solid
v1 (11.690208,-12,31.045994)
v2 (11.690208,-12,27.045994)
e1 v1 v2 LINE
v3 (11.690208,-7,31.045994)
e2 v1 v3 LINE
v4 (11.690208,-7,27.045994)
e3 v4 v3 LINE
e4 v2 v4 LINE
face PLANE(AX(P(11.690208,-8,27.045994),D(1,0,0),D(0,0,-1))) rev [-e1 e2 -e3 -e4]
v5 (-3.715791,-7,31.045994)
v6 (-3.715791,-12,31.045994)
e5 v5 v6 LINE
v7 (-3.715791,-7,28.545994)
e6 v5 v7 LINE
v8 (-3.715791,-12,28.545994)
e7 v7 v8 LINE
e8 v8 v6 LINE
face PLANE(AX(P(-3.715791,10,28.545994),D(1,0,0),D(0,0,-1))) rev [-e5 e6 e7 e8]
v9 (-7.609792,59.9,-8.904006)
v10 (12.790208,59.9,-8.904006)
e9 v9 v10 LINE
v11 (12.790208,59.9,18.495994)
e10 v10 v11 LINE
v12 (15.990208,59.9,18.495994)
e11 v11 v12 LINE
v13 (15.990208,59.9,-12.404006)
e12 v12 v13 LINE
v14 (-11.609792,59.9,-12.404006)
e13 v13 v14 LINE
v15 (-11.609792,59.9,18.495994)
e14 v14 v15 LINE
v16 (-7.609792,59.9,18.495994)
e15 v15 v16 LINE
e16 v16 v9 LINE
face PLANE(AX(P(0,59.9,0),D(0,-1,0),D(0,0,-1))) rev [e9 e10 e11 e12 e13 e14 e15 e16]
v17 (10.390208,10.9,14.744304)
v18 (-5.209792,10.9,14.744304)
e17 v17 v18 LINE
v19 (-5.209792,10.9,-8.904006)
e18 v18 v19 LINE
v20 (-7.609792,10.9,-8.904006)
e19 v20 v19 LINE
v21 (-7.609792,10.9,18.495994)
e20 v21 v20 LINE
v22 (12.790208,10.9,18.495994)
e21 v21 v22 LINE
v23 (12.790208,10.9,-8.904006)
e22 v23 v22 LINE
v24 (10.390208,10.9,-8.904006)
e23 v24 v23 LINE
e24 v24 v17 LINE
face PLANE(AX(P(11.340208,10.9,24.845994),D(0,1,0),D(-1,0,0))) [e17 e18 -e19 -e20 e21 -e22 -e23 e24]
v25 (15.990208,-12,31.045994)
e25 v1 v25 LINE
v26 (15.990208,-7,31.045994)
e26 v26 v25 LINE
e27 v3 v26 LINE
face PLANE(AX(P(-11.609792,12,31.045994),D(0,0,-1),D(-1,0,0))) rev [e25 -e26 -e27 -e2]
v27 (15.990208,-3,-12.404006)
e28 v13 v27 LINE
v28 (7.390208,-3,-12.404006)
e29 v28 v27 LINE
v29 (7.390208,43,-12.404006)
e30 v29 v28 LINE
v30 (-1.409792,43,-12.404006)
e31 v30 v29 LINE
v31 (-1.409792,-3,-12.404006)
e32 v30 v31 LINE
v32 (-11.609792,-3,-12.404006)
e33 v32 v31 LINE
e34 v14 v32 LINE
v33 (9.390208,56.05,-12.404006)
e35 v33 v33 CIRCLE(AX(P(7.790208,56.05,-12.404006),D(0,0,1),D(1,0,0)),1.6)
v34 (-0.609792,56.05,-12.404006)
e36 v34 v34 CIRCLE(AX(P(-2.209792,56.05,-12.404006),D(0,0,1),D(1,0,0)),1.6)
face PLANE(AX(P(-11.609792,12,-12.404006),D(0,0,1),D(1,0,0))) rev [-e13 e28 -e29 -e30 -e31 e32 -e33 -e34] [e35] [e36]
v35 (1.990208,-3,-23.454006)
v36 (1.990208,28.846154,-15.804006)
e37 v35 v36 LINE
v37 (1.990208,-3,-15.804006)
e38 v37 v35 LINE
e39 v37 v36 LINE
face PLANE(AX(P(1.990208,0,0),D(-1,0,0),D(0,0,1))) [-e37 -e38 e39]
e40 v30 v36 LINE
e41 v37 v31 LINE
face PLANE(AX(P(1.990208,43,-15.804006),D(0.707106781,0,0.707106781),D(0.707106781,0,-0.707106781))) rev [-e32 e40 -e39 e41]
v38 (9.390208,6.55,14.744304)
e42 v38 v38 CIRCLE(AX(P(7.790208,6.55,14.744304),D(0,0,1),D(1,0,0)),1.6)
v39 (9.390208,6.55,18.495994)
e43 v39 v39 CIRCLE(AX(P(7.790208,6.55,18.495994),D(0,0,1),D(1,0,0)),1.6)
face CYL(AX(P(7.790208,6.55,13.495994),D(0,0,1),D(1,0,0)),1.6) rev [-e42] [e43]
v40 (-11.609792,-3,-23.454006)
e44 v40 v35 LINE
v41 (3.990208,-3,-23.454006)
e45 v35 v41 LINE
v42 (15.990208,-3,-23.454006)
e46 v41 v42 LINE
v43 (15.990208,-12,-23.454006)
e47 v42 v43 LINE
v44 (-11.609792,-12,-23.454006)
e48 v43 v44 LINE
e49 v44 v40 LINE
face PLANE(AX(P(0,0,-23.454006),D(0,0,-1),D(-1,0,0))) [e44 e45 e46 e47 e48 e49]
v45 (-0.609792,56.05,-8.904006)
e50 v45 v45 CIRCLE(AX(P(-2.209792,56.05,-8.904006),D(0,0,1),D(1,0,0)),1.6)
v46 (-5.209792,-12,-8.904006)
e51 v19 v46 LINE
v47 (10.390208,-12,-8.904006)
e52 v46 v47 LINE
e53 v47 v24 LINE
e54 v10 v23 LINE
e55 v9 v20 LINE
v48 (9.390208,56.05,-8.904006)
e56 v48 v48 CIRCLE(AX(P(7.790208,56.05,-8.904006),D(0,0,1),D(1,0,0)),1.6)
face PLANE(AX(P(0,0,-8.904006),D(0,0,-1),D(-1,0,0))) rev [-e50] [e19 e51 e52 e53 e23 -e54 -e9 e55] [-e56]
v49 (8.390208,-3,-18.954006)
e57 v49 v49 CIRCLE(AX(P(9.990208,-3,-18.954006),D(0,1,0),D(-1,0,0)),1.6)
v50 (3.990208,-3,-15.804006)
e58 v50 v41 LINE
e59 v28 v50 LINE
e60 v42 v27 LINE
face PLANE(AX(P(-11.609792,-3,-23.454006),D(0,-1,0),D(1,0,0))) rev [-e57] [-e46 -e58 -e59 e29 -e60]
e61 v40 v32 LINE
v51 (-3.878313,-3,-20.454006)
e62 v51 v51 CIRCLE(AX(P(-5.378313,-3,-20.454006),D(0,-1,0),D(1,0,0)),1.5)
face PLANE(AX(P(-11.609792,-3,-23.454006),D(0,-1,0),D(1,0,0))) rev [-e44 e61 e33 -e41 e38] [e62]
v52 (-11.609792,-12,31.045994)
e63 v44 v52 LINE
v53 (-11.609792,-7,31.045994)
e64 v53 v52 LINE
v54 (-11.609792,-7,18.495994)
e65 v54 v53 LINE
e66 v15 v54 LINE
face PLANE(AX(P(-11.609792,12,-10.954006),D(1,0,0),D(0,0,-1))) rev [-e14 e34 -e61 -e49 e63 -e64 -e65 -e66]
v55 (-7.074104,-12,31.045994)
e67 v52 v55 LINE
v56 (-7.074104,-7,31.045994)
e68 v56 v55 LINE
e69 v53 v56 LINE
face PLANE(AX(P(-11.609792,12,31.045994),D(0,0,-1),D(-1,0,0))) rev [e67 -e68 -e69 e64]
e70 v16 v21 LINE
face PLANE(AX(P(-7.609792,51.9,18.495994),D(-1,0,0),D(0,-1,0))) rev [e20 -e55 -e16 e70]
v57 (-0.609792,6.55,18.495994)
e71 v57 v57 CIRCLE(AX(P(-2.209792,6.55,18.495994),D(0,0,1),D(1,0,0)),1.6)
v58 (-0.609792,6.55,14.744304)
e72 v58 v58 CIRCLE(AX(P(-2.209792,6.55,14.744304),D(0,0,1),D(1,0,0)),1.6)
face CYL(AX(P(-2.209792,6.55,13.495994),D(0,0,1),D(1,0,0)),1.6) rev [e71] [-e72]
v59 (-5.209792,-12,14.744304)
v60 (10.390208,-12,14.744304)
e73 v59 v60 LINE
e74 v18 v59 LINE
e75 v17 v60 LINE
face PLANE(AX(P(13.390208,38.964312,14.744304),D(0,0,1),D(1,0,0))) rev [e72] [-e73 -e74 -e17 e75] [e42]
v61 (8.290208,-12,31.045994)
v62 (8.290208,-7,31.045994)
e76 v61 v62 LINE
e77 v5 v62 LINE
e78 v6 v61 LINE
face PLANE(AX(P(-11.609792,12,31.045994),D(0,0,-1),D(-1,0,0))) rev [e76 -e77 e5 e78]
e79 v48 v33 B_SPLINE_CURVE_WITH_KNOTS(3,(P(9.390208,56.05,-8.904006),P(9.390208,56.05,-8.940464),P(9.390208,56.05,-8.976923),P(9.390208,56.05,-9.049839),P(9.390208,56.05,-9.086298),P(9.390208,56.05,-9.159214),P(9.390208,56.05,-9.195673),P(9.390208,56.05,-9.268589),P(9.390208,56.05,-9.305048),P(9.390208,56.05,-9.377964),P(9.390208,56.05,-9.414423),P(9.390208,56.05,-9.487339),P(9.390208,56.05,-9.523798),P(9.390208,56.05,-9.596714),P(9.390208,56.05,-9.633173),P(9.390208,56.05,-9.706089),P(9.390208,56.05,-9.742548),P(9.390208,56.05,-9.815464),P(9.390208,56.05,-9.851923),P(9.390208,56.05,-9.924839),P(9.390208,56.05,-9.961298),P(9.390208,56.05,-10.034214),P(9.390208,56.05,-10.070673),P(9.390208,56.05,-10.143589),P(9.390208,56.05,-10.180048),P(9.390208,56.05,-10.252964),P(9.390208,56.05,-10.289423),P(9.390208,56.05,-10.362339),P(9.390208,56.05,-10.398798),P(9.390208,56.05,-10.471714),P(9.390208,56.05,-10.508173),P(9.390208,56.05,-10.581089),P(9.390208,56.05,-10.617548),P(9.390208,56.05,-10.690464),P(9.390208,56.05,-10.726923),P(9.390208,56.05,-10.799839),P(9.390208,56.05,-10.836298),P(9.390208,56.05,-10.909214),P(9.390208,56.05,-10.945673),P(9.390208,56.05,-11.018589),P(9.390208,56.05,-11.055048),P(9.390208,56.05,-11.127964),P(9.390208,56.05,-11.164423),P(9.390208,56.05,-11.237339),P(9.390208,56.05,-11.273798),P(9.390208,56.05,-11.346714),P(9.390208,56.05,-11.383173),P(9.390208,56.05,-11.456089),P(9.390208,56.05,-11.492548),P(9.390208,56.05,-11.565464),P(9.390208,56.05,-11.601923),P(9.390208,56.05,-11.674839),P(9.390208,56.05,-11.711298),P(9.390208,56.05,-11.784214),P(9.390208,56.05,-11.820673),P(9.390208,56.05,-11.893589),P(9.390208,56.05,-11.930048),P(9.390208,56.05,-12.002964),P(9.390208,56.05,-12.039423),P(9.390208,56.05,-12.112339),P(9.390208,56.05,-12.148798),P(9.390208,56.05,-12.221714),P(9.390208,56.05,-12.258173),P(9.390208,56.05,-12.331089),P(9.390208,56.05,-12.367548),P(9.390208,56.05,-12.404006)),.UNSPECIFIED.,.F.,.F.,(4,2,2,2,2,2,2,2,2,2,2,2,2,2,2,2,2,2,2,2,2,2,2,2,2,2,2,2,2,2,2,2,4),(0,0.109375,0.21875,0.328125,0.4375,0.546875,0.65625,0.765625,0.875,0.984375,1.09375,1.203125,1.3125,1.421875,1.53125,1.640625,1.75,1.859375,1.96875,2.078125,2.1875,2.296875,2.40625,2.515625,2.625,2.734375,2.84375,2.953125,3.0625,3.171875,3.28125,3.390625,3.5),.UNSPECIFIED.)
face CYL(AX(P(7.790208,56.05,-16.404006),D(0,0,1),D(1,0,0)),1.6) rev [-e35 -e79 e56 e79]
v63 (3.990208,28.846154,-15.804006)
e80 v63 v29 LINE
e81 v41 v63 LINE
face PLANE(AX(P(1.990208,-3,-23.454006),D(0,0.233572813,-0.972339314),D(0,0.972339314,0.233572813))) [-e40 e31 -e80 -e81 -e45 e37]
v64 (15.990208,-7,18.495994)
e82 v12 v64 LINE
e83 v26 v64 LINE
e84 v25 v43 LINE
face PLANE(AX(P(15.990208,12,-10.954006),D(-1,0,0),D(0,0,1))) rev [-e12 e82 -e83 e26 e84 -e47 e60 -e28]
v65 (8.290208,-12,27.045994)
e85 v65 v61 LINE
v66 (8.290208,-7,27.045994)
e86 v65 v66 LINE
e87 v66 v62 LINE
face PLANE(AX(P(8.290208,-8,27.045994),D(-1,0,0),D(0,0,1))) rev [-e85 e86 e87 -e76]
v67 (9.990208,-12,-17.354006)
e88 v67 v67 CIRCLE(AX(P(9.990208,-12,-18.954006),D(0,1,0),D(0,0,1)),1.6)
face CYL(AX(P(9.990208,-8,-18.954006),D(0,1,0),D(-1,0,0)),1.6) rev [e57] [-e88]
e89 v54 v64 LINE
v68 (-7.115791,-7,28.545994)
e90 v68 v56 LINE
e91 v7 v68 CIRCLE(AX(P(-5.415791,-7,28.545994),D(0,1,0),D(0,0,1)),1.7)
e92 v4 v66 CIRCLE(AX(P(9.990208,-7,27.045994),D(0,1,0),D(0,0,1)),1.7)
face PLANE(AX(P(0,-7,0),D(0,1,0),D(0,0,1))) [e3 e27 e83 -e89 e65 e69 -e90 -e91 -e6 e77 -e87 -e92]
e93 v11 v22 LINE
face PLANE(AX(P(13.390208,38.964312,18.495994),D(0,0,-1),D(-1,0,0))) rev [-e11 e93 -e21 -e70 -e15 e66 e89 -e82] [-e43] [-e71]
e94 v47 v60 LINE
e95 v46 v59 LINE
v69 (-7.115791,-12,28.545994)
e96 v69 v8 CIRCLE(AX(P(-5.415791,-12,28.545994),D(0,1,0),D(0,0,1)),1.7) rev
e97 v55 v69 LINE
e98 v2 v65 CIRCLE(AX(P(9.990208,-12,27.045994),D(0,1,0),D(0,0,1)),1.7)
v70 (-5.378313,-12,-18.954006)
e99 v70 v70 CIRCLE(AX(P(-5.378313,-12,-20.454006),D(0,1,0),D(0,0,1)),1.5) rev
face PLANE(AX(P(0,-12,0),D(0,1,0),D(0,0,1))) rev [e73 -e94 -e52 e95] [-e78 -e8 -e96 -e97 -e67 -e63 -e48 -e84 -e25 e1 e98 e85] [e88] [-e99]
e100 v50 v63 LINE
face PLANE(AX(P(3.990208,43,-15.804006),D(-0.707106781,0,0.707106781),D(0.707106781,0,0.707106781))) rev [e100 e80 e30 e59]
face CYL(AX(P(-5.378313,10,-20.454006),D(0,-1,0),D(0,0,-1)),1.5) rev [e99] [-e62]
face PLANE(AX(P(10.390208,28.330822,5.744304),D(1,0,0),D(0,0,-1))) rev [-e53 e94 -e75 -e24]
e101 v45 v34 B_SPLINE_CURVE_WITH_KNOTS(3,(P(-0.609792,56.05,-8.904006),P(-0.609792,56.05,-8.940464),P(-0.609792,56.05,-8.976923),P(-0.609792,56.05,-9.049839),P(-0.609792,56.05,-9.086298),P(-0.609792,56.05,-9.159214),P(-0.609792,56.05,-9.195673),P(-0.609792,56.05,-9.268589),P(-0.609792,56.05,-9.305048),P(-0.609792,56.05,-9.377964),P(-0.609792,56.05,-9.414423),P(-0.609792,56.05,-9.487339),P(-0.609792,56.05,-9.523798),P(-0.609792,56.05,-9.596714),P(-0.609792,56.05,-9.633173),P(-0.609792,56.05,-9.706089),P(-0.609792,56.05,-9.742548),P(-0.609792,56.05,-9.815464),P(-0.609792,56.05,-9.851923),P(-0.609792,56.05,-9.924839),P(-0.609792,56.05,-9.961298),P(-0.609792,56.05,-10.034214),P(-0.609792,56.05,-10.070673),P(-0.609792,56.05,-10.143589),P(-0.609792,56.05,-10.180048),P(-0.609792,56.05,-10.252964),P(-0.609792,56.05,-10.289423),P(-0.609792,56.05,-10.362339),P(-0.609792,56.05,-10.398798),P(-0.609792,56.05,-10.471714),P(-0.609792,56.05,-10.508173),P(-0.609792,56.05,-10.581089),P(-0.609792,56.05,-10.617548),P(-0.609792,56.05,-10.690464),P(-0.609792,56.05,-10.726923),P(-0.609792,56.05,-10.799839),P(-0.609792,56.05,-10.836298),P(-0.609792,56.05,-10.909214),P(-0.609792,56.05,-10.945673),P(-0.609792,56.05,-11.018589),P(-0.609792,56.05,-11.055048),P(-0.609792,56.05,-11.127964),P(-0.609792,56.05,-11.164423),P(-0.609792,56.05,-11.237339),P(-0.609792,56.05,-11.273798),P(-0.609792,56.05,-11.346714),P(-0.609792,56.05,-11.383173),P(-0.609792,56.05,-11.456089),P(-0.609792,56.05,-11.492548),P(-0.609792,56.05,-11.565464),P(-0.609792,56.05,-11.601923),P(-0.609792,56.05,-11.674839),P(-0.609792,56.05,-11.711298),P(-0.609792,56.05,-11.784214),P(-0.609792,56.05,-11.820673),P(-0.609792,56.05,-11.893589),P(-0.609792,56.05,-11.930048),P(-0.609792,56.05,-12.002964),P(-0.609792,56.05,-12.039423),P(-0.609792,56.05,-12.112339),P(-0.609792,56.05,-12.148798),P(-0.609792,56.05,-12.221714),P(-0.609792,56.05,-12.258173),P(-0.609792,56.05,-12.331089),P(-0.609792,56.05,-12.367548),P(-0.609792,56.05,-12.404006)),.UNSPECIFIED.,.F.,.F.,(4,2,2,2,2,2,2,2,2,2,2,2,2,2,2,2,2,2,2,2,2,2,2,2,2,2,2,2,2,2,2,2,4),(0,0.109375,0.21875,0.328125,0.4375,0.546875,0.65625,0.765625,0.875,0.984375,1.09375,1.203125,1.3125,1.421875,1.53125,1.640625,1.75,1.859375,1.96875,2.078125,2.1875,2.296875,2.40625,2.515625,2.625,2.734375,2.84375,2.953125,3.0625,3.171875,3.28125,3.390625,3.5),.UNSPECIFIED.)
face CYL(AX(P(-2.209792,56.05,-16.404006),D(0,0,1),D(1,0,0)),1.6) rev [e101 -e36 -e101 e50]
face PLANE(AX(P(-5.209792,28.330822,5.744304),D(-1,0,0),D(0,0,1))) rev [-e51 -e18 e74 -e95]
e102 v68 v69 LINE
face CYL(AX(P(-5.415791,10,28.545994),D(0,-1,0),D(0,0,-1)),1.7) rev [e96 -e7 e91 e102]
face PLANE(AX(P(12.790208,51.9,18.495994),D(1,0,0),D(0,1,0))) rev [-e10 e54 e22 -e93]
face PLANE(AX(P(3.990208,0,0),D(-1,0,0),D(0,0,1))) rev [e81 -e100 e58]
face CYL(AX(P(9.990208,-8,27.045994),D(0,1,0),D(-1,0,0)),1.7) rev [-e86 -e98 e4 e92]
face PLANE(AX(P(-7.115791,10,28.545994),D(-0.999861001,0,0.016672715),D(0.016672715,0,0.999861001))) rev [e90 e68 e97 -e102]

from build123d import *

# Parameters (mm, degrees)
SKETCH1_W               = 25
SKETCH1_H               = 17
BOSS_EXTRUDE1_DEPTH     = 12
MOVE_FACE1_BY           = 15
MOVE_FACE3_BY           = 8
SKETCH3_W               = 25
SKETCH3_H               = 12.751689795
BOSS_EXTRUDE2_DEPTH     = 6.9
SKETCH4_W               = 5
SKETCH4_H               = 16.698310205
BOSS_EXTRUDE3_DEPTH     = 6.9
MOVE_START              = -11.609792285
MOVE_FACE4_OUTLINE_W    = 6.9
MOVE_FACE4_OUTLINE_H    = 16.698310205
MOVE_FACE4_DEPTH        = 2.4
MOVE_FACE5_BY           = 20
SKETCH6_W               = 25
SKETCH6_H               = 10.9
BOSS_EXTRUDE5_DEPTH     = 2
MOVE_FACE6_BY           = 1.5
MOVE_FACE7_BY           = 2.6
SKETCH7_W               = 3.8
SKETCH7_H               = 30.95
BOSS_EXTRUDE6_DEPTH     = 41
SKETCH8_W               = 16.2
SKETCH8_H               = 3.5
BOSS_EXTRUDE7_DEPTH     = 41
SKETCH9_W               = 3
SKETCH9_H               = 30.95
BOSS_EXTRUDE8_DEPTH     = 41
SKETCH10_W              = 4.6
SKETCH10_H              = 3.5
BOSS_EXTRUDE9_DEPTH     = 41
MOVE_FACE8_BY           = 9
MOVE_FACE9_OUTLINE_W    = 6
MOVE_FACE9_OUTLINE_H    = 6.301689795
MOVE_FACE9_OUTLINE_H_2  = 3.5
MOVE_FACE9_DEPTH        = 27.6
MOVE_START_2            = 8.390207715
MOVE_FACE9_2_OUTLINE_W  = 6
MOVE_FACE9_2_OUTLINE_H  = 23.698310205
MOVE_FACE9_2_DEPTH      = 7.6
MOVE_FACE9_3_OUTLINE_W  = 6
MOVE_FACE9_3_OUTLINE_H  = 23.698310205
MOVE_FACE9_3_DEPTH      = 7.4
MOVE_FACE10_BY          = 10
SKETCH11_W              = 27.6
SKETCH11_H              = 3
BOSS_EXTRUDE10_DEPTH    = 11
SKETCH12_R              = 1.5
CUT_EXTRUDE1_DEPTH      = 16
SKETCH13_R              = 1.6
CUT_EXTRUDE2_DEPTH      = 5
SKETCH14_R              = 1.6
CUT_EXTRUDE3_DEPTH      = 9
SKETCH15_R              = 1.6
CUT_EXTRUDE4_DEPTH      = 5
MOVE_FACE14_BY          = 1
MOVE_FACE15_OUTLINE_W   = 16.9
MOVE_FACE15_OUTLINE_H   = 23.698310205
MOVE_FACE15_DEPTH       = 2
MOVE_FACE16_BY          = 8
MOVE_FACE17_BY          = 6
MOVE_FACE19_BY          = 6
MOVE_FACE20_BY          = 5
MOVE_FACE21_BY          = 0.2
MOVE_FACE22_BY          = 0.2
MOVE_START_3            = -12.454005935
MOVE_FACE23_OUTLINE_W   = 27.6
MOVE_FACE23_OUTLINE_H   = 62.9
MOVE_FACE23_DEPTH       = 0.05
MOVE_FACE24_BY          = 0.05
SKETCH17_R              = 1.6
CUT_EXTRUDE5_DEPTH      = 7.5
BOSS_EXTRUDE12_DEPTH    = 2
BOSS_EXTRUDE13_DEPTH    = 46
CUT_EXTRUDE6_DEPTH      = 70.24755409
CUT_EXTRUDE6_DEPTH_BACK = 70.24755409


# Read off the part's stored shape, not the designer's step: Move Face4, Move Face9, Move Face15, Move Face23
with BuildPart() as part:
    # Sketch1 → Boss-Extrude1 (new body)
    with BuildSketch(Plane(origin=(0, 0, 0), x_dir=(1, 0, 0), z_dir=(0, 1, 0))):
        with Locations((0.890207715, 2.454005935)):
            Rectangle(SKETCH1_W, SKETCH1_H)
    extrude(amount=BOSS_EXTRUDE1_DEPTH)

    # Move Face1: a face moved outward by 15.0
    extrude(part.faces().sort_by_distance((0.890207715, 6, 6.045994065))[0], amount=MOVE_FACE1_BY, dir=(0, 0, 1))

    # Move Face3: a face moved inward by 8.0
    extrude(part.faces().sort_by_distance((0.890207715, 12, 5.045994065))[0], amount=MOVE_FACE3_BY, dir=(0, -1, 0), mode=Mode.SUBTRACT)

    # Sketch3 → Boss-Extrude2 (add)
    with BuildSketch(Plane(origin=(0, 4, 0), x_dir=(1, 0, 0), z_dir=(0, 1, 0))):
        with Locations((0.890207715, -12.120149168)):
            Rectangle(SKETCH3_W, SKETCH3_H)
    extrude(amount=BOSS_EXTRUDE2_DEPTH)

    # Sketch4 → Boss-Extrude3 (add)
    with BuildSketch(Plane(origin=(0, 4, 0), x_dir=(1, 0, 0), z_dir=(0, 1, 0))):
        with Locations((10.890207715, 2.604850833)):
            Rectangle(SKETCH4_W, SKETCH4_H)
        with Locations((-6.709792285, 2.604850833)):
            Rectangle(SKETCH4_W, SKETCH4_H)
    extrude(amount=BOSS_EXTRUDE3_DEPTH)

    # Move Face4 outline → Move Face4 (add)
    with BuildSketch(Plane.YZ.offset(MOVE_START)):
        with Locations((7.45, -2.604850833)):
            Rectangle(MOVE_FACE4_OUTLINE_W, MOVE_FACE4_OUTLINE_H)
    extrude(amount=MOVE_FACE4_DEPTH)

    # Move Face5: a face moved inward by 20.0
    extrude(part.faces().sort_by_distance((2.090207715, 4, -2.604850832))[0], amount=MOVE_FACE5_BY, dir=(0, -1, 0), mode=Mode.SUBTRACT)

    # Sketch6 → Boss-Extrude5 (add)
    with BuildSketch(Plane(origin=(0, 0, -10.954005935), x_dir=(-1, 0, 0), z_dir=(0, 0, -1))):
        with Locations((-0.890207715, 5.45)):
            Rectangle(SKETCH6_W, SKETCH6_H)
    extrude(amount=-BOSS_EXTRUDE5_DEPTH)

    # Move Face6: a face moved outward by 1.5
    extrude(part.faces().sort_by_distance((0.890207715, 5.45, -10.954005935))[0], amount=MOVE_FACE6_BY, dir=(0, 0, -1))

    # Move Face7: a face moved outward by 2.6
    extrude(part.faces().sort_by_distance((13.390207715, 5.348749838, 3.512570938))[0], amount=MOVE_FACE7_BY, dir=(1, 0, 0))

    # Sketch7 → Boss-Extrude6 (add)
    with BuildSketch(Plane(origin=(0, 10.9, 0), x_dir=(1, 0, 0), z_dir=(0, 1, 0))):
        with Locations((-9.709792285, -3.020994065)):
            Rectangle(SKETCH7_W, SKETCH7_H)
    extrude(amount=BOSS_EXTRUDE6_DEPTH)

    # Sketch8 → Boss-Extrude7 (add)
    with BuildSketch(Plane(origin=(0, 10.9, 0), x_dir=(1, 0, 0), z_dir=(0, 1, 0))):
        with Locations((0.290207715, 10.704005935)):
            Rectangle(SKETCH8_W, SKETCH8_H)
    extrude(amount=BOSS_EXTRUDE7_DEPTH)

    # Sketch9 → Boss-Extrude8 (add)
    with BuildSketch(Plane(origin=(0, 10.9, 0), x_dir=(1, 0, 0), z_dir=(0, 1, 0))):
        with Locations((14.490207715, -3.020994065)):
            Rectangle(SKETCH9_W, SKETCH9_H)
    extrude(amount=BOSS_EXTRUDE8_DEPTH)

    # Sketch10 → Boss-Extrude9 (add)
    with BuildSketch(Plane(origin=(0, 10.9, 0), x_dir=(1, 0, 0), z_dir=(0, 1, 0))):
        with Locations((10.690207715, 10.704005935)):
            Rectangle(SKETCH10_W, SKETCH10_H)
    extrude(amount=BOSS_EXTRUDE9_DEPTH)

    # Move Face8: a face moved inward by 9.0
    extrude(part.faces().sort_by_distance((2.090207715, 5.45, 5.74430427))[0], amount=MOVE_FACE8_BY, dir=(0, 0, 1), mode=Mode.SUBTRACT)

    # Move Face9 outline → Move Face9 (add)
    with BuildSketch(Plane.YZ.offset(MOVE_START)):
        with Locations((-3, 17.895149168)):
            Rectangle(MOVE_FACE9_OUTLINE_W, MOVE_FACE9_OUTLINE_H)
        with Locations((-3, -10.704005935)):
            Rectangle(MOVE_FACE9_OUTLINE_W, MOVE_FACE9_OUTLINE_H_2)
    extrude(amount=MOVE_FACE9_DEPTH)

    # Move Face9 2 outline → Move Face9 2 (add)
    with BuildSketch(Plane.YZ.offset(MOVE_START_2)):
        with Locations((-3, 2.895149167)):
            Rectangle(MOVE_FACE9_2_OUTLINE_W, MOVE_FACE9_2_OUTLINE_H)
    extrude(amount=MOVE_FACE9_2_DEPTH)

    # Move Face9 3 outline → Move Face9 3 (add)
    with BuildSketch(Plane.YZ.offset(MOVE_START)):
        with Locations((-3, 2.895149167)):
            Rectangle(MOVE_FACE9_3_OUTLINE_W, MOVE_FACE9_3_OUTLINE_H)
    extrude(amount=MOVE_FACE9_3_DEPTH)

    # Move Face10: a face moved outward by 10.0
    extrude(part.faces().sort_by_distance((2.190207715, -1, 21.045994065))[0], amount=MOVE_FACE10_BY, dir=(0, 0, 1))

    # Sketch11 → Boss-Extrude10 (add)
    with BuildSketch(Plane(origin=(0, 0, -12.454005935), x_dir=(-1, 0, 0), z_dir=(0, 0, -1))):
        with Locations((-2.190207715, -4.5)):
            Rectangle(SKETCH11_W, SKETCH11_H)
    extrude(amount=BOSS_EXTRUDE10_DEPTH)

    # Sketch12 → Cut-Extrude1 (cut)
    with BuildSketch(Plane.XZ.offset(6)):
        with Locations(Location((-5.378312816, -20.454005935, 0), (0, 0, 270))):
            Circle(SKETCH12_R)
        with BuildLine():
            Line((-3.715791402, 28.545994065), (-3.715791402, 31.045994065))
            Line((-3.715791402, 31.045994065), (-7.07410382, 31.045994065))
            Line((-7.07410382, 31.045994065), (-7.115791402, 28.545994065))
            ThreePointArc((-7.115791402, 28.545994065), (-5.415791402, 26.845994065), (-3.715791402, 28.545994065))
        make_face()
    extrude(amount=-CUT_EXTRUDE1_DEPTH, mode=Mode.SUBTRACT)

    # Sketch13 → Cut-Extrude2 (cut)
    with BuildSketch(Plane(origin=(0, -3, 0), x_dir=(1, 0, 0), z_dir=(0, 1, 0))):
        with Locations(Location((9.990207715, 18.954005935, 0), (0, 0, 180))):
            Circle(SKETCH13_R)
        with BuildLine():
            Line((11.690207715, -27.045994065), (11.690207715, -31.045994065))
            Line((11.690207715, -31.045994065), (8.290207715, -31.045994065))
            Line((8.290207715, -31.045994065), (8.290207715, -27.045994065))
            ThreePointArc((8.290207715, -27.045994065), (9.990207715, -25.345994065), (11.690207715, -27.045994065))
        make_face()
    extrude(amount=-CUT_EXTRUDE2_DEPTH, mode=Mode.SUBTRACT)

    # Sketch14 → Cut-Extrude3 (cut)
    with BuildSketch(Plane.XZ.offset(3)):
        with Locations((9.990207715, 27.045994065)):
            Circle(SKETCH14_R)
    extrude(amount=-CUT_EXTRUDE3_DEPTH, mode=Mode.SUBTRACT)

    # Sketch15 → Cut-Extrude4 (cut)
    with BuildSketch(Plane.XY.offset(18.495994065)):
        with Locations((-2.209792285, 6.55)):
            Circle(SKETCH15_R)
        with Locations((7.790207715, 6.55)):
            Circle(SKETCH15_R)
    extrude(amount=-CUT_EXTRUDE4_DEPTH, mode=Mode.SUBTRACT)

    # Move Face14: a face moved inward by 1.0
    extrude(part.faces().sort_by_distance((-4.209792285, 2.45, 2.895149168))[0], amount=MOVE_FACE14_BY, dir=(-1, 0, 0), mode=Mode.SUBTRACT)

    # Move Face15 outline → Move Face15 (cut)
    with BuildSketch(Plane.YZ.offset(MOVE_START_2)):
        with Locations((2.45, 2.895149167)):
            Rectangle(MOVE_FACE15_OUTLINE_W, MOVE_FACE15_OUTLINE_H)
    extrude(amount=MOVE_FACE15_DEPTH, mode=Mode.SUBTRACT)

    # Move Face16: a face moved outward by 8.0
    extrude(part.faces().sort_by_distance((2.190207715, 51.9, -9.359005935))[0], amount=MOVE_FACE16_BY, dir=(0, 1, 0))

    # Move Face17: a face moved inward by 6.0
    extrude(part.faces().sort_by_distance((2.300746103, 4, 24.541741789))[0], amount=MOVE_FACE17_BY, dir=(0, -1, 0), mode=Mode.SUBTRACT)

    # Move Face19: a face moved outward by 6.0
    extrude(part.faces().sort_by_distance((13.230207715, -6, 3.795994065))[0], amount=MOVE_FACE19_BY, dir=(0, -1, 0))

    # Move Face20: a face moved inward by 5.0
    extrude(part.faces().sort_by_distance((2.300746103, -2, 24.541741789))[0], amount=MOVE_FACE20_BY, dir=(0, -1, 0), mode=Mode.SUBTRACT)

    # Move Face21: a face moved outward by 0.2
    extrude(part.faces().sort_by_distance((-7.809792285, 35.4, 4.770994065))[0], amount=MOVE_FACE21_BY, dir=(1, 0, 0))

    # Move Face22: a face moved outward by 0.2
    extrude(part.faces().sort_by_distance((12.990207715, 35.4, 4.770994065))[0], amount=MOVE_FACE22_BY, dir=(-1, 0, 0))

    # Move Face23 outline → Move Face23 (cut)
    with BuildSketch(Plane.XY.offset(MOVE_START_3)):
        with Locations((2.190207715, 28.45)):
            Rectangle(MOVE_FACE23_OUTLINE_W, MOVE_FACE23_OUTLINE_H)
    extrude(amount=MOVE_FACE23_DEPTH, mode=Mode.SUBTRACT)

    # Move Face24: a face moved outward by 0.05
    extrude(part.faces().sort_by_distance((2.590207715, 25.934788184, -8.954005935))[0], amount=MOVE_FACE24_BY, dir=(0, 0, 1))

    # Sketch17 → Cut-Extrude5 (cut)
    with BuildSketch(Plane.XY.offset(-8.904005935)):
        with Locations((-2.209792285, 56.05)):
            Circle(SKETCH17_R)
        with Locations((7.790207715, 56.05)):
            Circle(SKETCH17_R)
    extrude(amount=-CUT_EXTRUDE5_DEPTH, mode=Mode.SUBTRACT)

    # Sketch19 → Boss-Extrude12 (add)
    with BuildSketch(Plane(origin=(3.990207715, 0, 0), x_dir=(0, 0, -1), z_dir=(1, 0, 0))):
        Polygon((23.454005935, -3), (12.404005935, 43), (12.404005935, -3), align=None)
    extrude(amount=-BOSS_EXTRUDE12_DEPTH)

    # Sketch20 → Boss-Extrude13 (add)
    with BuildSketch(Plane(origin=(0, -3, 0), x_dir=(1, 0, 0), z_dir=(0, 1, 0))):
        Polygon((1.990207715, 15.804005935), (-1.409792285, 12.404005935), (1.990207715, 12.404005935), align=None)
        Polygon((3.990207715, 15.804005935), (7.390207715, 12.404005935), (3.990207715, 12.404005935), align=None)
    extrude(amount=BOSS_EXTRUDE13_DEPTH)

    # Sketch21 → Cut-Extrude6 (cut, two sides: drawn at the far end of the back side and taken through both)
    with BuildSketch(Plane(origin=(3.990207715, 0, 0), x_dir=(0, 0, -1), z_dir=(1, 0, 0)).offset(-CUT_EXTRUDE6_DEPTH_BACK)):
        Polygon((15.902869946, 28.434593255), (12.404005935, 43), (16.038201458, 43), align=None)
    extrude(amount=CUT_EXTRUDE6_DEPTH + CUT_EXTRUDE6_DEPTH_BACK, mode=Mode.SUBTRACT)


solid = part.part
